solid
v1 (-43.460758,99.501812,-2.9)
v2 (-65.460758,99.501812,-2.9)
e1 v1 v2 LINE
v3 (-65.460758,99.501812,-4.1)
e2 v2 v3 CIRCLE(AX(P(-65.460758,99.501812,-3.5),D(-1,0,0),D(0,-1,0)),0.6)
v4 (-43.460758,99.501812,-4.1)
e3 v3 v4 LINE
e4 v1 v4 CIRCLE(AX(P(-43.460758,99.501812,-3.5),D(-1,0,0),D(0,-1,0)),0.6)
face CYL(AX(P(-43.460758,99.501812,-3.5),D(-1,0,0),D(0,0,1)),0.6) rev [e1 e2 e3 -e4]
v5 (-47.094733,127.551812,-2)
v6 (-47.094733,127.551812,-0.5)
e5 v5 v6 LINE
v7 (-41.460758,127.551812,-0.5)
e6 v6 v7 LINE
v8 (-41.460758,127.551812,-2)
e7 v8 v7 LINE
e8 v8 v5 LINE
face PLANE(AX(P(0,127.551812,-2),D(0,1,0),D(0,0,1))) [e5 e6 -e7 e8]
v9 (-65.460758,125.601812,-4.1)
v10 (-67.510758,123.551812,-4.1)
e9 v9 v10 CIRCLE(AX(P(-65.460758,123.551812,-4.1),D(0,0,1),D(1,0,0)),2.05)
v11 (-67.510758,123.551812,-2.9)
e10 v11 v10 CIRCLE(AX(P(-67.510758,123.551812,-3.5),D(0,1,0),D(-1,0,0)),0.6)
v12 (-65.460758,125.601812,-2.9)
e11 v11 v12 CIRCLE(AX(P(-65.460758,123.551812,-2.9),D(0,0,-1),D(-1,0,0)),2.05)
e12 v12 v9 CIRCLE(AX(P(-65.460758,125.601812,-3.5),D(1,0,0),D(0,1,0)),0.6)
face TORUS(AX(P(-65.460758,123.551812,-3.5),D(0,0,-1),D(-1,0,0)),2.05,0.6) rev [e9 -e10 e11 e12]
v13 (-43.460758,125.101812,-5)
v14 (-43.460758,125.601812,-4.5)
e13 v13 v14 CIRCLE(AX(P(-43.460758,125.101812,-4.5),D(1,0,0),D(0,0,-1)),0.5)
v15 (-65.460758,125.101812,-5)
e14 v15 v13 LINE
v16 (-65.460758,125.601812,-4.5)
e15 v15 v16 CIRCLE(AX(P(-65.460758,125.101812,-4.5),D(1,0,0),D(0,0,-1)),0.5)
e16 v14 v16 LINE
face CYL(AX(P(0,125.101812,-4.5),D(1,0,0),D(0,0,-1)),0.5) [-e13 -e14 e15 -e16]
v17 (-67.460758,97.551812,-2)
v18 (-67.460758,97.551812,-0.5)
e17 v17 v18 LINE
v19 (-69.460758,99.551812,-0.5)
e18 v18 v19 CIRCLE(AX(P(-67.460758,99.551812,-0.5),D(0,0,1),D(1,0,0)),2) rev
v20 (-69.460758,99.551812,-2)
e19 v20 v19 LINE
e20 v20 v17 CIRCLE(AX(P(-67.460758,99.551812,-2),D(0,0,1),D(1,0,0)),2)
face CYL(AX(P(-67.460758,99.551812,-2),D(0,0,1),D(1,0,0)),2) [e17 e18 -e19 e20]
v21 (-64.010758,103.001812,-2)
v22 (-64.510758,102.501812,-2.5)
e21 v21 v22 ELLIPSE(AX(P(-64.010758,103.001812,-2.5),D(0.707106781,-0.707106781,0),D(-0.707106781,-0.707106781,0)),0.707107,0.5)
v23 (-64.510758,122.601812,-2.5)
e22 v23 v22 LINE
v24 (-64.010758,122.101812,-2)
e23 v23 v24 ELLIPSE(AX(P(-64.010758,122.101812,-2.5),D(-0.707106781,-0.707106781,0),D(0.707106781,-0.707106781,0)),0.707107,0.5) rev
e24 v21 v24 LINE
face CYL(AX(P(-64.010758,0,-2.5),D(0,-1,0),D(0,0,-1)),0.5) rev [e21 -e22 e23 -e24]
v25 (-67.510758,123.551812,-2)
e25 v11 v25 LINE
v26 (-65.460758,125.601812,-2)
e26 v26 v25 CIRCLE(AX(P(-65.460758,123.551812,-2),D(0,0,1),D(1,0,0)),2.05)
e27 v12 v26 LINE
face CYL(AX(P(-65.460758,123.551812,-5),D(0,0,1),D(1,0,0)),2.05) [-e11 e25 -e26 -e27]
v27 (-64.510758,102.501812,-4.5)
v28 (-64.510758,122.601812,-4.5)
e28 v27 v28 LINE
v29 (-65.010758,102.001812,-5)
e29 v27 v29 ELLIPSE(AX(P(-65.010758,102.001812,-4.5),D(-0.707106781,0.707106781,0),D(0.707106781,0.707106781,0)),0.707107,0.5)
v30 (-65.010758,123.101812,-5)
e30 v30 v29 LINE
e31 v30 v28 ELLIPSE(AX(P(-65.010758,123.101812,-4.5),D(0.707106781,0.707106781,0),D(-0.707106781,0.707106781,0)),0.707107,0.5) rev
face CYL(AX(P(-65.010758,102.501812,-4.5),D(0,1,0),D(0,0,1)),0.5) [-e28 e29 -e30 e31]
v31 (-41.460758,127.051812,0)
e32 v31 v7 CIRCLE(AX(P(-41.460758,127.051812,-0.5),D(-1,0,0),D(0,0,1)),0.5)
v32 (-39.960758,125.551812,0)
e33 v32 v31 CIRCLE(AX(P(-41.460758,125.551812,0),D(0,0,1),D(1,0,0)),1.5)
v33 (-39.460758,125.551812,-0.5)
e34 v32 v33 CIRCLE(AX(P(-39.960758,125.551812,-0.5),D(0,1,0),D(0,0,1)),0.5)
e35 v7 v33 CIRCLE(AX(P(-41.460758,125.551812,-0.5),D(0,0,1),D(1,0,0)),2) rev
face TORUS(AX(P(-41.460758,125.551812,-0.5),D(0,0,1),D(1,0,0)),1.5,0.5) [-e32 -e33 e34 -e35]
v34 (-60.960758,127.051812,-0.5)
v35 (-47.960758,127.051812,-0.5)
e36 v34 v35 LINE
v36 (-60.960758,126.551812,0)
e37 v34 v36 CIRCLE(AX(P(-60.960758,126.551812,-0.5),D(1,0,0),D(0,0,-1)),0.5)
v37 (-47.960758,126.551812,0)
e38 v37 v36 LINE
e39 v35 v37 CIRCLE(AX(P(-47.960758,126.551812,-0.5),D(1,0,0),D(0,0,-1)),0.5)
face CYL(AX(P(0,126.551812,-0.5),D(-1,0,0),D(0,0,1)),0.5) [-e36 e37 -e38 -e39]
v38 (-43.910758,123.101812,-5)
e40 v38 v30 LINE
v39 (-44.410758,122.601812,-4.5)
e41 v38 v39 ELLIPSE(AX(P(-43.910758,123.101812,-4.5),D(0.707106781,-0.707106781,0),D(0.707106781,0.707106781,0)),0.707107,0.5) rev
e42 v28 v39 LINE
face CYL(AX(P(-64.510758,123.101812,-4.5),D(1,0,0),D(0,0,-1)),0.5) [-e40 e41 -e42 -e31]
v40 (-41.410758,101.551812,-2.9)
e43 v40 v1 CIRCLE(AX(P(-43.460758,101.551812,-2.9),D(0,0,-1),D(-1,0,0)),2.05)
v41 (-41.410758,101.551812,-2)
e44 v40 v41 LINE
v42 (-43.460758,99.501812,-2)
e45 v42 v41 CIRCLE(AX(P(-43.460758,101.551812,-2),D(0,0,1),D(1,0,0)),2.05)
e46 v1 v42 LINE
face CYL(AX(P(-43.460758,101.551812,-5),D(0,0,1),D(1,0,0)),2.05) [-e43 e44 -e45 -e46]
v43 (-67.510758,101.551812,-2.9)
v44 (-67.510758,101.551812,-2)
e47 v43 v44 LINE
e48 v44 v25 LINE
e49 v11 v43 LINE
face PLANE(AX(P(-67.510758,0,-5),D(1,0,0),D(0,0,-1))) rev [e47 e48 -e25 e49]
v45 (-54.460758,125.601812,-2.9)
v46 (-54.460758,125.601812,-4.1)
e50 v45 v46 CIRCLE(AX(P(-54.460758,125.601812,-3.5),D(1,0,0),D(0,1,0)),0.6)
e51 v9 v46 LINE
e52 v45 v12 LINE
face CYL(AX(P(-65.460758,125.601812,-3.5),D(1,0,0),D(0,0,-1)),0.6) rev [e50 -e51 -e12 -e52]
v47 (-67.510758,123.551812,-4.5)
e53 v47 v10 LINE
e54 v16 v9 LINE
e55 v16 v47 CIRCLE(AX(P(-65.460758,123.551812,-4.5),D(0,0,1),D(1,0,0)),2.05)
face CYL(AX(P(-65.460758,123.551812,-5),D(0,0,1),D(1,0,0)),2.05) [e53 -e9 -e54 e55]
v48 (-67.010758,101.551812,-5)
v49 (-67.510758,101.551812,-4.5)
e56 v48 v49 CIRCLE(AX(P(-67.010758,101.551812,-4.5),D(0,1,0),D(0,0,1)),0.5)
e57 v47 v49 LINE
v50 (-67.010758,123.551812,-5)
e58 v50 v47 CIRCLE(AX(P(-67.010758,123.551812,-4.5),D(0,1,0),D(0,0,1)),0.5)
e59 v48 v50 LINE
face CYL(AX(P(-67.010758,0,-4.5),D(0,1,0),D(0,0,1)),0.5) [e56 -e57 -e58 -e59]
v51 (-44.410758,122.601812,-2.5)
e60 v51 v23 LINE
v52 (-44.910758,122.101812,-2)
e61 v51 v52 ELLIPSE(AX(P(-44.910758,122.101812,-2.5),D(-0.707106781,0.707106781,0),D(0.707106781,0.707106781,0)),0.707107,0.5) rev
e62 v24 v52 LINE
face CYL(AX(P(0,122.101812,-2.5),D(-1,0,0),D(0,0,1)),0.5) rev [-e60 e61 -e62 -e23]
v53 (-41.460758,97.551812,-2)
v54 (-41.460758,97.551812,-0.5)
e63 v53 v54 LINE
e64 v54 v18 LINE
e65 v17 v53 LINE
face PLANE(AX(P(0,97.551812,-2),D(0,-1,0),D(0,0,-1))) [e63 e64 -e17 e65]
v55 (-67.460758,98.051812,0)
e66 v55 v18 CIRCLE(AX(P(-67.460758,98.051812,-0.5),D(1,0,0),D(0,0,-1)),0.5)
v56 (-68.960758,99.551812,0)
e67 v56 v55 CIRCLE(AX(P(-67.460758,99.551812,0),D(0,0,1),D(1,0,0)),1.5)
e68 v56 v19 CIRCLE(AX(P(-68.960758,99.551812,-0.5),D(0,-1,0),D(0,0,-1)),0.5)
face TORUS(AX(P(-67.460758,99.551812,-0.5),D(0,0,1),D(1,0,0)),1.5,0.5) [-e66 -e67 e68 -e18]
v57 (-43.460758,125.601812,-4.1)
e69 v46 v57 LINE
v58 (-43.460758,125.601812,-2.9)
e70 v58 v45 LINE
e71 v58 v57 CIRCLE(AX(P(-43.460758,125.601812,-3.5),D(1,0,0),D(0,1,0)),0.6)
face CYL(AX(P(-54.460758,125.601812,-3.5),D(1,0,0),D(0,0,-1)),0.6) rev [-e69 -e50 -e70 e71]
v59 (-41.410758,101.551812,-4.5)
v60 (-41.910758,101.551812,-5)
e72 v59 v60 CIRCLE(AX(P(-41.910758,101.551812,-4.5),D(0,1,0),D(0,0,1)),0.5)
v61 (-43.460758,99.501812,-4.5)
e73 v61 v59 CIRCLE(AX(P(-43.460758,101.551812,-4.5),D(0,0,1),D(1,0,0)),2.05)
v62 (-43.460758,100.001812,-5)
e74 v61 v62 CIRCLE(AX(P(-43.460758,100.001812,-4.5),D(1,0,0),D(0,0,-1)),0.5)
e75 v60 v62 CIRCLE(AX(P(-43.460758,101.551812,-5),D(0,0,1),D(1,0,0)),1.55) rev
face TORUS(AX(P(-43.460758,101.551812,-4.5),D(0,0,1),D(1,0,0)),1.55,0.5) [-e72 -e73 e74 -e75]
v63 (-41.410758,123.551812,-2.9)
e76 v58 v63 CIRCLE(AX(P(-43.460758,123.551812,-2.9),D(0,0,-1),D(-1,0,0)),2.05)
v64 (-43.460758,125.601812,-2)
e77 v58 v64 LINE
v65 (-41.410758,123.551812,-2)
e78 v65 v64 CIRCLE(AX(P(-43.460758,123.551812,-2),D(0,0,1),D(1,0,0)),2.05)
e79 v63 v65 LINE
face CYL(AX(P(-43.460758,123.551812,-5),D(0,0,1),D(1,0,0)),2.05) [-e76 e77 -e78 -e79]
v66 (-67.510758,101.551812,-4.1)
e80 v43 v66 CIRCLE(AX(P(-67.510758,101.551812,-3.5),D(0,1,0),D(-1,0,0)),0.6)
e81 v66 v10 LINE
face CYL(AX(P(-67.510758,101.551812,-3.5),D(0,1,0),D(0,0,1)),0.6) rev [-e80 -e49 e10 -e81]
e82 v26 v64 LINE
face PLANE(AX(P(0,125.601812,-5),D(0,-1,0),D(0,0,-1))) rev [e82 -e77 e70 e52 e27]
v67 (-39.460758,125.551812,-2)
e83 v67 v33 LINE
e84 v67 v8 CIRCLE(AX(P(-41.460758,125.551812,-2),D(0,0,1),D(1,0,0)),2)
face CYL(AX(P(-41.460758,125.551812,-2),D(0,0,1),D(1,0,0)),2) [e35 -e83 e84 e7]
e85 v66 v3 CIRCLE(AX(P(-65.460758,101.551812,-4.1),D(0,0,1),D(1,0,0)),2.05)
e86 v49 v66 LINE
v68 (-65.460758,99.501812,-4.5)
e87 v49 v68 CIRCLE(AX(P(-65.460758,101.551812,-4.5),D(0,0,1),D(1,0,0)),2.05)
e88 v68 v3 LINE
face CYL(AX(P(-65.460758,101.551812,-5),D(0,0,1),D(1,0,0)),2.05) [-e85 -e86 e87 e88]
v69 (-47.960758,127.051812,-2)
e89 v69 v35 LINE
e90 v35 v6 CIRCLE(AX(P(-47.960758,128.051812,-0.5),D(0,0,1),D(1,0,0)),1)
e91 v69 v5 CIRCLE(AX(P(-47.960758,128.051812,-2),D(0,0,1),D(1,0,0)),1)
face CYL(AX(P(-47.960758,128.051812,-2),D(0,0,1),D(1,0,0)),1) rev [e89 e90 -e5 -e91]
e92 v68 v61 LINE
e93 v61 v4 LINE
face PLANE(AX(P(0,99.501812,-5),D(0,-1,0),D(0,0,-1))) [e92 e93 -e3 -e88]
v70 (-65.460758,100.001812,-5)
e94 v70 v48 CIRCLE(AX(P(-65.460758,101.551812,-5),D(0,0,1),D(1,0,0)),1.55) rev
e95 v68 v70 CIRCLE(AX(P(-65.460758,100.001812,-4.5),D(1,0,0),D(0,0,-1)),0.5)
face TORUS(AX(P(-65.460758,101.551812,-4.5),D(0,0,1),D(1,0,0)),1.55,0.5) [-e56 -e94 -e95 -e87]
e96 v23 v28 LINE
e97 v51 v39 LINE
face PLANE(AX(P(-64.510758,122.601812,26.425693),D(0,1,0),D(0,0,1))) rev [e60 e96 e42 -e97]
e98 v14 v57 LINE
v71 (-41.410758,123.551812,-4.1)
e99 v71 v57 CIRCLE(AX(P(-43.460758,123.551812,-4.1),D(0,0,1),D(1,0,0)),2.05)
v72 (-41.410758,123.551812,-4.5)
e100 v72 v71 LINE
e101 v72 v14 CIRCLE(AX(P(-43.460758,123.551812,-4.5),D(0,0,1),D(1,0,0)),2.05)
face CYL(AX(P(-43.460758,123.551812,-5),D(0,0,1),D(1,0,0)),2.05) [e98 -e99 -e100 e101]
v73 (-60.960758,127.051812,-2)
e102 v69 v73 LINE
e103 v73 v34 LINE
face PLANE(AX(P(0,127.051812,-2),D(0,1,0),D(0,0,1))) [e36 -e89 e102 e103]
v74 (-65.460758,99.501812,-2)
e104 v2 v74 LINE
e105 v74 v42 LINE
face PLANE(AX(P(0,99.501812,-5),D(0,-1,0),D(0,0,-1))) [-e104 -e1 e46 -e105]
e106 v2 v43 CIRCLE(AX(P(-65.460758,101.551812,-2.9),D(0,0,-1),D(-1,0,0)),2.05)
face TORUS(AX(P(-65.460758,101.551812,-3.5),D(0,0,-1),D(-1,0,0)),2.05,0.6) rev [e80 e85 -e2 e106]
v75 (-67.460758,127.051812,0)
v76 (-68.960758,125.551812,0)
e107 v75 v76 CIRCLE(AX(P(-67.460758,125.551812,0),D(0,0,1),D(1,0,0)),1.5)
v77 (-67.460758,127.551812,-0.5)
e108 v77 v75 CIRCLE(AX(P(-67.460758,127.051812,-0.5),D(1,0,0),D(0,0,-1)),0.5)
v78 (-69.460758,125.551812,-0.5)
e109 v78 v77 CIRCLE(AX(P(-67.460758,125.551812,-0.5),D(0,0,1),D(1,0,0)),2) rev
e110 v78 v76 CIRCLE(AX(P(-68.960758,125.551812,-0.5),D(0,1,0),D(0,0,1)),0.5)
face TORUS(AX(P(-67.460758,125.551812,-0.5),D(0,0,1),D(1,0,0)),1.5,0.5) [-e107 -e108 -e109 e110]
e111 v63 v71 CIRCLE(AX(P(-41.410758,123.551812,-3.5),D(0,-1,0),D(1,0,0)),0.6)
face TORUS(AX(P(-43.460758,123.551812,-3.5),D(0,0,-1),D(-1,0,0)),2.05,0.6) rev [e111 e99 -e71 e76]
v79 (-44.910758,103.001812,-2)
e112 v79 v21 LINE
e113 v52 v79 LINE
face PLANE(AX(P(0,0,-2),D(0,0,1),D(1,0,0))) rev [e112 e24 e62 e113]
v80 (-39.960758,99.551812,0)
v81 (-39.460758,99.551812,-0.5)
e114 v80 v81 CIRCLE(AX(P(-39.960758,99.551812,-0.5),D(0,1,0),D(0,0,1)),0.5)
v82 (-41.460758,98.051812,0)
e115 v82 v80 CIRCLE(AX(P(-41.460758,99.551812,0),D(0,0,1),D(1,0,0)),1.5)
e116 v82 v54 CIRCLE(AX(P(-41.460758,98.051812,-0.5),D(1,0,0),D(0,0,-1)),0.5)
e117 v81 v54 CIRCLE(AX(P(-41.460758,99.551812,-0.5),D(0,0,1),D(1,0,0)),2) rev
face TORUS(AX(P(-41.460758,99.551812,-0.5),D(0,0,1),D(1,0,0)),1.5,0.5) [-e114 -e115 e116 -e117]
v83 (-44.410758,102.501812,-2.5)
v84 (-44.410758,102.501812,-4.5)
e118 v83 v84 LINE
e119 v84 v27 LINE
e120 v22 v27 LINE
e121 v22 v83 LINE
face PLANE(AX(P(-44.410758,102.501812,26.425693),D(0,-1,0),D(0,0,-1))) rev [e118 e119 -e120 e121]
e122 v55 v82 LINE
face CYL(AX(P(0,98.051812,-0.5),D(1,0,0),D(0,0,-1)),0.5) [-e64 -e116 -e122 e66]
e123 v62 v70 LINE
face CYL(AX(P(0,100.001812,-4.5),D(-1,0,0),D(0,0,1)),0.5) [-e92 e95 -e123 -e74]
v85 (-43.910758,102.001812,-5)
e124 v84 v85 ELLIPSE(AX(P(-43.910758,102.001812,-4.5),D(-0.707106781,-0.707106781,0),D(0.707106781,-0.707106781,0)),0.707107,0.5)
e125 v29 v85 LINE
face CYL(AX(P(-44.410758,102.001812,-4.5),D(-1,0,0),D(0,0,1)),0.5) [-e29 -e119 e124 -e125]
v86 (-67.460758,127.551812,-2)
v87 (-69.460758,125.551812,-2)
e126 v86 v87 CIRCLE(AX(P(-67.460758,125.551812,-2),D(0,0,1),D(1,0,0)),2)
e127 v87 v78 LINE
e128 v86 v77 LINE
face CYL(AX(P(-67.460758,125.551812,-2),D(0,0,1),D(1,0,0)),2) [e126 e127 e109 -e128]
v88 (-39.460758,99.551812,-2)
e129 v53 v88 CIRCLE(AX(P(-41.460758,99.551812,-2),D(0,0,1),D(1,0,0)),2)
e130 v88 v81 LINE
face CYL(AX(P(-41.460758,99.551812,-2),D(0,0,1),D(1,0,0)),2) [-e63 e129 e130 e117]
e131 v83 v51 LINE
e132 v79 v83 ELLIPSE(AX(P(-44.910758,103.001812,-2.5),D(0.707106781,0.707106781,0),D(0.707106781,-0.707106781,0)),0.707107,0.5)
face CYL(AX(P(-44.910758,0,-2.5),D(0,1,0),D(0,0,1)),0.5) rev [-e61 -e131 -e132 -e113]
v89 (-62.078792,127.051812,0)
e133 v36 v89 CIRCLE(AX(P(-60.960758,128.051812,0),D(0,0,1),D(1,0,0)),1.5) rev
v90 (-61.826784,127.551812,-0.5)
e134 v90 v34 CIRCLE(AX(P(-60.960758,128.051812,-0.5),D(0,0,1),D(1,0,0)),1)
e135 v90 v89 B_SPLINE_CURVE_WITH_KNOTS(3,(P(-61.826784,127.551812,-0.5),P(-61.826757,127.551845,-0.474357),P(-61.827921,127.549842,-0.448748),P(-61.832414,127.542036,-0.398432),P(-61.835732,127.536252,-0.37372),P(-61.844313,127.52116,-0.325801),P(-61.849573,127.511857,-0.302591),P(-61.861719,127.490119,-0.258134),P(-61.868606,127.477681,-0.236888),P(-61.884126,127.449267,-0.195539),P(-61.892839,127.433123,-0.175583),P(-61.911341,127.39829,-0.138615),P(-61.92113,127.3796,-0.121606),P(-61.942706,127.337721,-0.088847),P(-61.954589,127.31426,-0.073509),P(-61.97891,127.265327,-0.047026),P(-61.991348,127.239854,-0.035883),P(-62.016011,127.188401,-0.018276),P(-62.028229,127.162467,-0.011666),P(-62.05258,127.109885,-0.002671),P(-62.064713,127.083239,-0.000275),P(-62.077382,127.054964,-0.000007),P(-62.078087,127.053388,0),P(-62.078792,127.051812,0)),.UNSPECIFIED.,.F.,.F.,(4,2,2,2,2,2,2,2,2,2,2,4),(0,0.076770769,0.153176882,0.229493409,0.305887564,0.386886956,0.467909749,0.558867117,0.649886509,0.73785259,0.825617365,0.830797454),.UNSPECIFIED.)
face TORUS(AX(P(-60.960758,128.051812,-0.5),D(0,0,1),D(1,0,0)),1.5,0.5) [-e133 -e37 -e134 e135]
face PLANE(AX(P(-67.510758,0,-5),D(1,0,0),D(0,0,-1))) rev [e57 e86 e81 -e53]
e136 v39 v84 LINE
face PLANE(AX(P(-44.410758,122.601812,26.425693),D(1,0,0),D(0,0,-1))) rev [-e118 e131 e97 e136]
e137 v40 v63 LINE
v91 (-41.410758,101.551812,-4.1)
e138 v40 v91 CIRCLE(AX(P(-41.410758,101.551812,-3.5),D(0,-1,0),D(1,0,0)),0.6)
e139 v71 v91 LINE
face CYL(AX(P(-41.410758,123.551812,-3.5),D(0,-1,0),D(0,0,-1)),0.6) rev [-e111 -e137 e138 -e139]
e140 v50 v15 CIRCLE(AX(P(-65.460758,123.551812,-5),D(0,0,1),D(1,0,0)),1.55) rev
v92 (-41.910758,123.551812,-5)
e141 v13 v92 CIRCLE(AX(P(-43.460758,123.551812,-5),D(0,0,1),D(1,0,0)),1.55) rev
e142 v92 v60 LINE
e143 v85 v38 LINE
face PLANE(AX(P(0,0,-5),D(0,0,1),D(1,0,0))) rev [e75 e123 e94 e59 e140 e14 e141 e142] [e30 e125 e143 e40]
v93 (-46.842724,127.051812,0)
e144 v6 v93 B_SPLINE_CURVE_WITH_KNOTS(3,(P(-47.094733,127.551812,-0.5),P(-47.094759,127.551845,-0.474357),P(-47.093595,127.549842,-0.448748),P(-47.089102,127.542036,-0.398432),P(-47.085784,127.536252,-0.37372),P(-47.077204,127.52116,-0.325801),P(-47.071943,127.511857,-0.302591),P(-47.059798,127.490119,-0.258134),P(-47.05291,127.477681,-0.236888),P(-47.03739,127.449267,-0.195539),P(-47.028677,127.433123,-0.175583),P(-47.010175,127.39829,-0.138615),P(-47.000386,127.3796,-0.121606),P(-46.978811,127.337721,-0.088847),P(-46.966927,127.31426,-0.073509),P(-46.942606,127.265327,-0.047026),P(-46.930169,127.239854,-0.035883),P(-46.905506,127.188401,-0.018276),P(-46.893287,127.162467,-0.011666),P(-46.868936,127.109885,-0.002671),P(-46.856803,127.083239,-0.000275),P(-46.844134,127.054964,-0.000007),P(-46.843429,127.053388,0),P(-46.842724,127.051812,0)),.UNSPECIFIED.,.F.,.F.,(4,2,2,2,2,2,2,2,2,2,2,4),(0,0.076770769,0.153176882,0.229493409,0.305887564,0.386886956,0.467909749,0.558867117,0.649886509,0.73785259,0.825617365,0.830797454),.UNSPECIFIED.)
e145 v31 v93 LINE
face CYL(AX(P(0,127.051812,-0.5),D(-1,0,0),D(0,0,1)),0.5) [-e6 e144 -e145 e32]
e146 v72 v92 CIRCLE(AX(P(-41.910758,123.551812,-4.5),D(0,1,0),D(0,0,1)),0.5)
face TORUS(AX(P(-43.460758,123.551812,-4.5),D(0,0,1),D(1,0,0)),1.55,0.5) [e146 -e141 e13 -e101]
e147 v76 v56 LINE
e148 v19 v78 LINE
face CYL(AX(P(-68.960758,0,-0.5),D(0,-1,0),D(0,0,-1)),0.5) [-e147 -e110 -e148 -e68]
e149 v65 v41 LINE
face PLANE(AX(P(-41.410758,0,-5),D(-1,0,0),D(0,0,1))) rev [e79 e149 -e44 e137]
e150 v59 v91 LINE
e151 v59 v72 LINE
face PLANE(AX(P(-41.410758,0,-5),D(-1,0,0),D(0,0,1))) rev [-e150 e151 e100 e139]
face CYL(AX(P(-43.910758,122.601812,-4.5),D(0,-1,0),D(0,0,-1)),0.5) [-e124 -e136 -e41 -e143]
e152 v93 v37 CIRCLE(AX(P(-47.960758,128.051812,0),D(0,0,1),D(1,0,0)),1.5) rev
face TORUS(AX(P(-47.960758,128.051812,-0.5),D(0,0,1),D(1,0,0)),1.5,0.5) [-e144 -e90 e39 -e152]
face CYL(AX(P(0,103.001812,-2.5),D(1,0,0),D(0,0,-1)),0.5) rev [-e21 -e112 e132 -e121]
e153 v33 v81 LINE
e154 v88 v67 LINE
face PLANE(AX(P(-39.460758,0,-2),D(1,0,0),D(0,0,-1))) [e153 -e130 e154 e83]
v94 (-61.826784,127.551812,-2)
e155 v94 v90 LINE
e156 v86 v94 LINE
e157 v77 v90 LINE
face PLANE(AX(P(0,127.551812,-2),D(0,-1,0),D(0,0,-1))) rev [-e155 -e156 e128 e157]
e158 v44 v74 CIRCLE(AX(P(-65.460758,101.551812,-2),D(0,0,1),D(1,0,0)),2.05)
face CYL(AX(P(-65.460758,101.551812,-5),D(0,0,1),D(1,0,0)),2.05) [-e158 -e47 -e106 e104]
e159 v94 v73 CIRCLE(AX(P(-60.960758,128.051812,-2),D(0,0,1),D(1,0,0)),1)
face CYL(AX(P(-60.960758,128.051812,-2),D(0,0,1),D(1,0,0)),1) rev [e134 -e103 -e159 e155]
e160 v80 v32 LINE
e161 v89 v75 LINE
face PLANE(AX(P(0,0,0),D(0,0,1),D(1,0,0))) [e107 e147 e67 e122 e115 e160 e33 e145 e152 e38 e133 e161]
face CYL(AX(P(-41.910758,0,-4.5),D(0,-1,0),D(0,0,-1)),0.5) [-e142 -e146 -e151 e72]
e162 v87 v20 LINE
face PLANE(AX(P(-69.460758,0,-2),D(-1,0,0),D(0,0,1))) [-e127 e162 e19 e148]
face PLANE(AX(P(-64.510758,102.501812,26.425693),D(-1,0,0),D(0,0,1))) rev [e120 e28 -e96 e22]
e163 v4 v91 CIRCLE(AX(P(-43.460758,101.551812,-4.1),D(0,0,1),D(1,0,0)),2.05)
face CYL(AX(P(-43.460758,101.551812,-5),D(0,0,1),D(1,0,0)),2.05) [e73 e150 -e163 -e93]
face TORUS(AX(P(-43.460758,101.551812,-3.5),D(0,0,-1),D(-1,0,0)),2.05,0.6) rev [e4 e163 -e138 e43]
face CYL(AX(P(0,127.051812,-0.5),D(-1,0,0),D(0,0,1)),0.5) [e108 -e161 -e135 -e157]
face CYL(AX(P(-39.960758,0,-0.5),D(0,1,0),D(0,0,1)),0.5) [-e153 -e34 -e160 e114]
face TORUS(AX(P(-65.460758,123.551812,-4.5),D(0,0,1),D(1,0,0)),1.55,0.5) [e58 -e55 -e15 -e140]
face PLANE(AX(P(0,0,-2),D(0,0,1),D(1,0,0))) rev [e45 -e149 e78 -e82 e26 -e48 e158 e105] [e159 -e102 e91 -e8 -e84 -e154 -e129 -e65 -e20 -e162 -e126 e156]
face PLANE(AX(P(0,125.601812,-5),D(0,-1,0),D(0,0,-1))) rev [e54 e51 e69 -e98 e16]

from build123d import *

# Parameters (mm, degrees)
BOSS_EXTRUDE1_DEPTH = 2
BOSS_EXTRUDE2_DEPTH = 5
SKETCH6_W           = 20.1
SKETCH6_H           = 20.1
CUT_EXTRUDE1_DEPTH  = 3
SKETCH5_R           = 0.6
FILLET1_R           = 0.5


with BuildPart() as part:
    # Sketch2 → Boss-Extrude1 (new body)
    with BuildSketch(Plane.XY):
        with BuildLine():
            ThreePointArc((-60.960758129, 127.051811933), (-61.460758129, 127.185786529), (-61.826783532, 127.551811933))
            Line((-61.826783532, 127.551811933), (-67.460758129, 127.551811933))
            ThreePointArc((-67.460758129, 127.551811933), (-68.874971691, 126.966025495), (-69.460758129, 125.551811933))
            Line((-69.460758129, 125.551811933), (-69.460758129, 99.551811933))
            ThreePointArc((-69.460758129, 99.551811933), (-68.874971691, 98.13759837), (-67.460758129, 97.551811933))
            Line((-67.460758129, 97.551811933), (-41.460758129, 97.551811933))
            ThreePointArc((-41.460758129, 97.551811933), (-40.046544566, 98.13759837), (-39.460758129, 99.551811933))
            Line((-39.460758129, 99.551811933), (-39.460758129, 125.551811933))
            ThreePointArc((-39.460758129, 125.551811933), (-40.046544566, 126.966025495), (-41.460758129, 127.551811933))
            Line((-41.460758129, 127.551811933), (-47.094732725, 127.551811933))
            ThreePointArc((-47.094732725, 127.551811933), (-47.460758129, 127.185786529), (-47.960758129, 127.051811933))
            Line((-47.960758129, 127.051811933), (-60.960758129, 127.051811933))
        make_face()
    extrude(amount=-BOSS_EXTRUDE1_DEPTH)

    # Sketch2<2> → Boss-Extrude2 (add)
    with BuildSketch(Plane.XY):
        with BuildLine():
            Line((-65.460758129, 99.501811933), (-43.460758129, 99.501811933))
            ThreePointArc((-43.460758129, 99.501811933), (-42.011189227, 100.102243031), (-41.410758129, 101.551811933))
            Line((-41.410758129, 101.551811933), (-41.410758129, 123.551811933))
            ThreePointArc((-41.410758129, 123.551811933), (-42.011189227, 125.001380834), (-43.460758129, 125.601811933))
            Line((-43.460758129, 125.601811933), (-65.460758129, 125.601811933))
            ThreePointArc((-65.460758129, 125.601811933), (-66.91032703, 125.001380834), (-67.510758129, 123.551811933))
            Line((-67.510758129, 123.551811933), (-67.510758129, 101.551811933))
            ThreePointArc((-67.510758129, 101.551811933), (-66.91032703, 100.102243031), (-65.460758129, 99.501811933))
        make_face()
    extrude(amount=-BOSS_EXTRUDE2_DEPTH)

    # Sketch6 → Cut-Extrude1 (cut)
    with BuildSketch(Plane(origin=(0, 0, -5), x_dir=(-1, 0, 0), z_dir=(0, 0, -1))):
        with Locations((54.460758129, 112.551811933)):
            Rectangle(SKETCH6_W, SKETCH6_H)
    extrude(amount=-CUT_EXTRUDE1_DEPTH, mode=Mode.SUBTRACT)

    # Cut-Sweep1: sweep along a path in Sketch4
    with BuildLine(Plane.XY.offset(-3.5)) as cut_sweep1_path:
        Line((-41.410758129, 101.551811933), (-41.410758129, 123.551811933))
        ThreePointArc((-41.410758129, 123.551811933), (-42.011189227, 125.001380834), (-43.460758129, 125.601811933))
        Line((-43.460758129, 125.601811933), (-65.460758129, 125.601811933))
        ThreePointArc((-65.460758129, 125.601811933), (-66.91032703, 125.001380834), (-67.510758129, 123.551811933))
        Line((-67.510758129, 123.551811933), (-67.510758129, 101.551811933))
        ThreePointArc((-67.510758129, 101.551811933), (-66.91032703, 100.102243031), (-65.460758129, 99.501811933))
        Line((-65.460758129, 99.501811933), (-43.460758129, 99.501811933))
        ThreePointArc((-43.460758129, 99.501811933), (-42.011189227, 100.102243031), (-41.410758129, 101.551811933))
    # Sketch5 → Cut-Sweep1 (sweep, cut)
    with BuildSketch(Plane(origin=(-54.460758129, 0, 0), x_dir=(0, 0, -1), z_dir=(1, 0, 0))):
        with Locations((3.5, 125.601811933)):
            Circle(SKETCH5_R)
    sweep(path=cut_sweep1_path.line, mode=Mode.SUBTRACT)

    # Fillet1
    fillet1_edges = [part.edges().sort_by_distance(p)[0] for p in [
        (-44.277745427, 127.551811933, 0),
        (-40.046544566, 126.966025495, 0),
        (-39.460758129, 112.551811933, 0),
        (-40.046544566, 98.13759837, 0),
        (-54.460758129, 97.551811933, 0),
        (-68.874971691, 98.13759837, 0),
        (-69.460758129, 112.551811933, 0),
        (-68.874971691, 126.966025495, 0),
        (-64.64377083, 127.551811933, 0),
        (-61.460758129, 127.185786529, 0),
        (-54.460758129, 127.051811933, 0),
        (-47.460758129, 127.185786529, 0),
        (-64.510758129, 112.551811933, -2),
        (-54.460758129, 102.501811933, -2),
        (-44.410758129, 112.551811933, -2),
        (-54.460758129, 122.601811933, -2),
        (-42.011189227, 125.001380834, -5),
        (-54.460758129, 125.601811933, -5),
        (-66.91032703, 125.001380834, -5),
        (-67.510758129, 112.551811933, -5),
        (-66.91032703, 100.102243031, -5),
        (-54.460758129, 99.501811933, -5),
        (-42.011189227, 100.102243031, -5),
        (-41.410758129, 112.551811933, -5),
        (-64.510758129, 112.551811933, -5),
        (-54.460758129, 122.601811933, -5),
        (-44.410758129, 112.551811933, -5),
        (-54.460758129, 102.501811933, -5),
    ]]
    fillet(fillet1_edges, radius=FILLET1_R - 0.0001)  # a hair under: the kernel refuses the full size


solid = part.part
